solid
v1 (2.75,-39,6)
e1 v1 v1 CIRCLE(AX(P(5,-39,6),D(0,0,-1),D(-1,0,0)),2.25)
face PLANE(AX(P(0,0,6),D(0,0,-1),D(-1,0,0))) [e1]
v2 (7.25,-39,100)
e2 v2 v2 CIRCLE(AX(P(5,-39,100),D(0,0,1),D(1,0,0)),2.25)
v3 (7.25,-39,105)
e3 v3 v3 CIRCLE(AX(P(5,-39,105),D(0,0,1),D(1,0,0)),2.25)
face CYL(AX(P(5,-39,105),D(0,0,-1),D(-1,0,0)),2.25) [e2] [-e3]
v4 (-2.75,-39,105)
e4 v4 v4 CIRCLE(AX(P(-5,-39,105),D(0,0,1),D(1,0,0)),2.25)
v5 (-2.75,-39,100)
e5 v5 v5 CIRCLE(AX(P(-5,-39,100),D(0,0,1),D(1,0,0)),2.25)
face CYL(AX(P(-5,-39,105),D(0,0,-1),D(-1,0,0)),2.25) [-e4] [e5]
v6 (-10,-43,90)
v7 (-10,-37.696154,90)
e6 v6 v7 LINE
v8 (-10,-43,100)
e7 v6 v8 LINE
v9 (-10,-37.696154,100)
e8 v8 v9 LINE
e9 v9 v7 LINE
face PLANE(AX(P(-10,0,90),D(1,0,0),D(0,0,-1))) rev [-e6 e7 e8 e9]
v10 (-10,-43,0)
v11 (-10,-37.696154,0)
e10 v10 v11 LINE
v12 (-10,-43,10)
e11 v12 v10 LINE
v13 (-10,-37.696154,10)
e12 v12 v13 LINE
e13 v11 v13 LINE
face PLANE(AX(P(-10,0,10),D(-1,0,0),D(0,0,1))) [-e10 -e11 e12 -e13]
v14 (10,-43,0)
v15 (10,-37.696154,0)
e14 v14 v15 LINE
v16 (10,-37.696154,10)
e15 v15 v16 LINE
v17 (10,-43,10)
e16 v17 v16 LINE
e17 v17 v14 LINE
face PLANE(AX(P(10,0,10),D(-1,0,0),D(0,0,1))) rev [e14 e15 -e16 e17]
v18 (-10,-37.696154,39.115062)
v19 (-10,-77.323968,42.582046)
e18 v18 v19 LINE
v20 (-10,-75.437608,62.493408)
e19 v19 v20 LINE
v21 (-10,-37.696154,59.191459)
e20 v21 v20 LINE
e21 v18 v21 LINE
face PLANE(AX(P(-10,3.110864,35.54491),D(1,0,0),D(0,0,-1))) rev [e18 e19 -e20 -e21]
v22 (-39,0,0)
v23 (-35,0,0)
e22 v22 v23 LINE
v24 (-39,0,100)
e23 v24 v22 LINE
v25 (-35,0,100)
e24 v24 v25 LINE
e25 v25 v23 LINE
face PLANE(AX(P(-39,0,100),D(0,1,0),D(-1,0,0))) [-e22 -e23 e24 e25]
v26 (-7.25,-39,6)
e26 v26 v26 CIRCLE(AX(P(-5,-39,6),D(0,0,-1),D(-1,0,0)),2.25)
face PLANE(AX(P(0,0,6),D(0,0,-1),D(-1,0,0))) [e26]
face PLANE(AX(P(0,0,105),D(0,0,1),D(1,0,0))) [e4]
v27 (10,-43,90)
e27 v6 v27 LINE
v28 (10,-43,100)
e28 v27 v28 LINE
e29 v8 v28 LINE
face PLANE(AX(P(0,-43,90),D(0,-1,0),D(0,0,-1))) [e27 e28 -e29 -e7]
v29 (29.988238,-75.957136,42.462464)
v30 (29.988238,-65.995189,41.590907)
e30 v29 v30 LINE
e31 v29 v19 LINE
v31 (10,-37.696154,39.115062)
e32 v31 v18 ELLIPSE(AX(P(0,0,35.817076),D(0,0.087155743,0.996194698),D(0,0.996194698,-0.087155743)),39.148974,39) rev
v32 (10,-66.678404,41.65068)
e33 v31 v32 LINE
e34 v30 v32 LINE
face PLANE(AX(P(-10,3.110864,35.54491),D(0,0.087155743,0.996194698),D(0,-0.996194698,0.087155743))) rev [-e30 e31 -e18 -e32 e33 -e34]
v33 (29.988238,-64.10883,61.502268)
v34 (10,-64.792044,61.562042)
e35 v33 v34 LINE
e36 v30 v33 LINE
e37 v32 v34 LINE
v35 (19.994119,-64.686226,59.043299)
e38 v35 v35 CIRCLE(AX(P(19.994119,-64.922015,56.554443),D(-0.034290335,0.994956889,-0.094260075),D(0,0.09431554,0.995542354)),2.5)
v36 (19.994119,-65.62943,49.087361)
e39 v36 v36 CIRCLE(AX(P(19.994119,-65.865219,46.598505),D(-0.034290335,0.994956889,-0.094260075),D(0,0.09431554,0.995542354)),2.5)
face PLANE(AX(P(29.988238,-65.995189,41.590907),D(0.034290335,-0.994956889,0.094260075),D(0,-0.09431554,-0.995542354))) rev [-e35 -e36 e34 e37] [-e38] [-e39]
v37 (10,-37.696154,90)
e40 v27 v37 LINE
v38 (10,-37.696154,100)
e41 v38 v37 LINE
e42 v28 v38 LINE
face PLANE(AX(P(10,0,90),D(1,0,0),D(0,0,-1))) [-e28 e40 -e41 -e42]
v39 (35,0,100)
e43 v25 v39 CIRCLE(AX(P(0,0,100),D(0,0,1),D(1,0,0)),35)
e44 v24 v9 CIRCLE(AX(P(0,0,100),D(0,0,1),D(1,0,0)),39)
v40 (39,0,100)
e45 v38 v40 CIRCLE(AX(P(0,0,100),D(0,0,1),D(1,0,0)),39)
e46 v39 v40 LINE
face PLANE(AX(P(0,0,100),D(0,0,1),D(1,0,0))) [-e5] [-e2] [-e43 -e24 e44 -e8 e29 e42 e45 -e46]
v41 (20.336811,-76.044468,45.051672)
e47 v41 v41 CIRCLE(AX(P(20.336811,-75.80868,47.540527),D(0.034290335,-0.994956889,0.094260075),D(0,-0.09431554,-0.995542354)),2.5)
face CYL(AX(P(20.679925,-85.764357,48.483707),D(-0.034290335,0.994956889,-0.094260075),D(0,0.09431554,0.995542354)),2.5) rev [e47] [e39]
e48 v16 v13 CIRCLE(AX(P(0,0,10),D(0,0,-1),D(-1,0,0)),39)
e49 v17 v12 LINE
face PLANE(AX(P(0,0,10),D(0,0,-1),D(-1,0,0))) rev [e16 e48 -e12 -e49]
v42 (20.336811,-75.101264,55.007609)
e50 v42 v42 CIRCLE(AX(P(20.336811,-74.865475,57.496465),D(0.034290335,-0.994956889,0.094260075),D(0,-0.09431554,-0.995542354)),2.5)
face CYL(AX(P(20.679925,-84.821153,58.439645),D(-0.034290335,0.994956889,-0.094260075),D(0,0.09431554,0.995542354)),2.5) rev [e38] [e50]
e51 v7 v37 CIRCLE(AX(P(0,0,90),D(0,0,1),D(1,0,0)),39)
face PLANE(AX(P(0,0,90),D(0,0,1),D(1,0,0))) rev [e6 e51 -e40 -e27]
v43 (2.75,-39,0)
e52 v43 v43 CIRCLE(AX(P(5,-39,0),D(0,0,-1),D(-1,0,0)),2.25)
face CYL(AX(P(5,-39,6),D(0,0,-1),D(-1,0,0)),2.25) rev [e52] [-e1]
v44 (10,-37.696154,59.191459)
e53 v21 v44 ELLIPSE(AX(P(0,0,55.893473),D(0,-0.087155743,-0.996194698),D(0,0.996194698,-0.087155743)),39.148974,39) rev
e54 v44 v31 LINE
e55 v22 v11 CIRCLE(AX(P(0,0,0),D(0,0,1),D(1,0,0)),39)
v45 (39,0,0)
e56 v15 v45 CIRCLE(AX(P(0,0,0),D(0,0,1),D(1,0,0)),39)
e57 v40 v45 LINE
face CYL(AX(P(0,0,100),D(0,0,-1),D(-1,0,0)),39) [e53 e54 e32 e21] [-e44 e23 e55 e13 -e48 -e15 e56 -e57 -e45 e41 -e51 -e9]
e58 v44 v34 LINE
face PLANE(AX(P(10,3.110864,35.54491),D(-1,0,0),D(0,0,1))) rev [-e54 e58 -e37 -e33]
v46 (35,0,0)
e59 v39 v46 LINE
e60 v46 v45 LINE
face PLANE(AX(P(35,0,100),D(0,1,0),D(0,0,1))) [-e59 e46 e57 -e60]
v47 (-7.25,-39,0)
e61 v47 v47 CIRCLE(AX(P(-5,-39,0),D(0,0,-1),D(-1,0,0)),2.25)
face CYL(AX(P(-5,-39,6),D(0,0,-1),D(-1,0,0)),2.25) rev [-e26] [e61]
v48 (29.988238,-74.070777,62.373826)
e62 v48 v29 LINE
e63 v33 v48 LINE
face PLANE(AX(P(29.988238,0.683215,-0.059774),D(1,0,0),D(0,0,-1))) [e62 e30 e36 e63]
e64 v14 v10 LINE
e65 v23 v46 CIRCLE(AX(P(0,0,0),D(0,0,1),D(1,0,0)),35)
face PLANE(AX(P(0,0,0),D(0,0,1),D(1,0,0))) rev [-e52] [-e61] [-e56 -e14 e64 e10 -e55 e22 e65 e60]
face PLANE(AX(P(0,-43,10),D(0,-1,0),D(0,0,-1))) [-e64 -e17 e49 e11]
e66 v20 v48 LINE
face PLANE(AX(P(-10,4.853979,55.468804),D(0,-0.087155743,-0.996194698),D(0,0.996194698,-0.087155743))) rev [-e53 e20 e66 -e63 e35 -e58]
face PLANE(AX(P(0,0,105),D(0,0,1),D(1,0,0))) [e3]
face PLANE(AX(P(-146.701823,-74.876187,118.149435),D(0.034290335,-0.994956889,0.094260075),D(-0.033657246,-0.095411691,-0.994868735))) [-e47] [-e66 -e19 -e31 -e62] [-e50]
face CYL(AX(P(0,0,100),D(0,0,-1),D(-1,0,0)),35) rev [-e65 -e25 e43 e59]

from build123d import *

# Parameters (mm, degrees)
EXTRUDE_THIN1_DEPTH       = 100
BOSS_EXTRUDE1_START       = -10
BOSS_EXTRUDE1_DEPTH       = 10
SKETCH3_R                 = 2.25
BOSS_EXTRUDE2_DEPTH       = 5
BOSS_EXTRUDE3_DEPTH       = 10
SKETCH5_R                 = 2.25
CUT_EXTRUDE1_DEPTH        = 6
BOSS_EXTRUDE4_REACH       = 121.416
BOSS_EXTRUDE4_END_RADIUS  = 39
SKETCH10_W                = 20
SKETCH10_H                = 20
BOSS_EXTRUDE5_START       = -29.189050103
BOSS_EXTRUDE5_OUTLINE_W   = 20
BOSS_EXTRUDE5_OUTLINE_H   = 20
BOSS_EXTRUDE5_DEPTH       = 29.189050103
BOSS_EXTRUDE5_START_2     = 80.604897745
BOSS_EXTRUDE5_2_OUTLINE_W = 23
BOSS_EXTRUDE5_2_OUTLINE_H = 23
BOSS_EXTRUDE5_2_DEPTH     = 1.395102255
BOSS_EXTRUDE6_DEPTH       = 20
SKETCH12_R                = 2.5
CUT_EXTRUDE2_DEPTH        = 20


with BuildPart() as part:
    # Sketch1 → Extrude-Thin1 (new body)
    with BuildSketch(Plane.XY):
        with BuildLine():
            ThreePointArc((-35, 0), (0, -35), (35, 0))
            Line((35, 0), (39, 0))
            ThreePointArc((39, 0), (0, -39), (-39, 0))
            Line((-39, 0), (-35, 0))
        make_face()
    extrude(amount=EXTRUDE_THIN1_DEPTH)

    # Sketch2 → Boss-Extrude1 (add)
    with BuildSketch(Plane.XY.offset(100).offset(BOSS_EXTRUDE1_START)):
        with BuildLine():
            Line((0, -39), (0, -35))
            Line((0, -35), (-10, -35))
            Line((-10, -35), (-10, -37.69615365))
            ThreePointArc((-10, -37.69615365), (-5.042321274, -38.672664715), (0, -39))
        make_face()
        with BuildLine():
            Line((10, -35), (0, -35))
            Line((0, -35), (0, -39))
            ThreePointArc((0, -39), (5.042321274, -38.672664715), (10, -37.69615365))
            Line((10, -37.69615365), (10, -35))
        make_face()
        with BuildLine():
            ThreePointArc((10, -37.69615365), (5.042321274, -38.672664715), (0, -39))
            ThreePointArc((0, -39), (-5.042321274, -38.672664715), (-10, -37.69615365))
            Line((-10, -37.69615365), (-10, -43))
            Line((-10, -43), (10, -43))
            Line((10, -43), (10, -37.69615365))
        make_face()
    extrude(amount=BOSS_EXTRUDE1_DEPTH)

    # Sketch3 → Boss-Extrude2 (add)
    with BuildSketch(Plane.XY.offset(100)):
        with Locations((-5, -39)):
            Circle(SKETCH3_R)
        with Locations((5, -39)):
            Circle(SKETCH3_R)
    extrude(amount=BOSS_EXTRUDE2_DEPTH)

    # Sketch4 → Boss-Extrude3 (add)
    with BuildSketch(Plane(origin=(0, 0, 0), x_dir=(-1, 0, 0), z_dir=(0, 0, -1))):
        with BuildLine():
            Line((0, -39), (0, -35))
            Line((0, -35), (-10, -35))
            Line((-10, -35), (-10, -37.69615365))
            ThreePointArc((-10, -37.69615365), (-5.042321274, -38.672664715), (0, -39))
        make_face()
        with BuildLine():
            ThreePointArc((10, -37.69615365), (5.042321274, -38.672664715), (0, -39))
            ThreePointArc((0, -39), (-5.042321274, -38.672664715), (-10, -37.69615365))
            Line((-10, -37.69615365), (-10, -43))
            Line((-10, -43), (10, -43))
            Line((10, -43), (10, -37.69615365))
        make_face()
        with BuildLine():
            Line((10, -35), (0, -35))
            Line((0, -35), (0, -39))
            ThreePointArc((0, -39), (5.042321274, -38.672664715), (10, -37.69615365))
            Line((10, -37.69615365), (10, -35))
        make_face()
    extrude(amount=-BOSS_EXTRUDE3_DEPTH)

    # Sketch5 → Cut-Extrude1 (cut)
    with BuildSketch(Plane(origin=(0, 0, 0), x_dir=(-1, 0, 0), z_dir=(0, 0, -1))):
        with Locations(Location((-5, -39, 0), (0, 0, 180))):
            Circle(SKETCH5_R)
        with Locations(Location((5, -39, 0), (0, 0, 180))):
            Circle(SKETCH5_R)
    extrude(amount=-CUT_EXTRUDE1_DEPTH, mode=Mode.SUBTRACT)

    # Boss-Extrude4: up to this cylinder (the profile starts outside it)
    boss_extrude4_end = Plane(origin=(0, 0, 50), z_dir=(0, 0, -1)) * Cylinder(BOSS_EXTRUDE4_END_RADIUS, 321.832, mode=Mode.PRIVATE)
    # Sketch10 → Boss-Extrude4 (add, up to the surface)
    with BuildSketch(Plane(origin=(0, -51.355775573, 4.493048169), x_dir=(1, 0, 0), z_dir=(0, 0.9961946980917462, -0.08715574274765152)), mode=Mode.PRIVATE) as boss_extrude4_sk1:
        with Locations((0, -45.680780994)):
            Rectangle(SKETCH10_W, SKETCH10_H)
    boss_extrude4_tool1 = extrude(boss_extrude4_sk1.sketch, amount=BOSS_EXTRUDE4_REACH, mode=Mode.PRIVATE) - boss_extrude4_end
    add(boss_extrude4_tool1.solids().sort_by_distance((0, -47.374433, 50))[0])

    # Boss-Extrude5: read off the stored shape, not the designer's step
    # Boss-Extrude5 outline → Boss-Extrude5 (add)
    with BuildSketch(Plane(origin=(0, -51.355775573, 4.493048169), x_dir=(1, 0, 0), z_dir=(0, 0.9961946980917462, -0.08715574274765152)).offset(BOSS_EXTRUDE5_START)):
        with Locations((0, -45.680780994)):
            Rectangle(BOSS_EXTRUDE5_OUTLINE_W, BOSS_EXTRUDE5_OUTLINE_H)
    extrude(amount=BOSS_EXTRUDE5_DEPTH)

    # Boss-Extrude5 2 outline → Boss-Extrude5 2 (cut)
    with BuildSketch(Plane(origin=(0, 0, 0), x_dir=(0.9994119135527714, 0.034137480457277325, -0.0032341114416132855), z_dir=(0.03429033462636031, -0.994956889147722, 0.09426007473315588)).offset(BOSS_EXTRUDE5_START_2)):
        with Locations((-2.5, 45.5)):
            Rectangle(BOSS_EXTRUDE5_2_OUTLINE_W, BOSS_EXTRUDE5_2_OUTLINE_H)
    extrude(amount=BOSS_EXTRUDE5_2_DEPTH, mode=Mode.SUBTRACT)

    # Sketch11 → Boss-Extrude6 (add, along a direction that is not the sketch's normal)
    with BuildSketch(Plane(origin=(10, 0, 0), x_dir=(0, 0, -1), z_dir=(1, 0, 0))):
        Polygon((-62.433599326, -74.753991325), (-42.522237652, -76.640350885), (-41.650680224, -66.678403904), (-61.562041898, -64.792044344), align=None)
    extrude(amount=BOSS_EXTRUDE6_DEPTH, dir=(0.999411883181242, 0.034160731366775, -0.002988676732389044))

    # Sketch12 → Cut-Extrude2 (cut)
    with BuildSketch(Plane(origin=(2.421276084, -70.254937612, 6.655801615), x_dir=(0.9994101830326217, 0.033961906388074226, -0.00508674406564492), z_dir=(-0.03429033462636031, 0.994956889147722, -0.09426007473315609))):
        with Locations(Location((17.489772292, -50.21182287, 0), (0, 0, 269.893376297))):
            Circle(SKETCH12_R)
        with Locations(Location((17.508382589, -40.211323595, 0), (0, 0, 269.893376297))):
            Circle(SKETCH12_R)
    extrude(amount=-CUT_EXTRUDE2_DEPTH, mode=Mode.SUBTRACT)


solid = part.part
